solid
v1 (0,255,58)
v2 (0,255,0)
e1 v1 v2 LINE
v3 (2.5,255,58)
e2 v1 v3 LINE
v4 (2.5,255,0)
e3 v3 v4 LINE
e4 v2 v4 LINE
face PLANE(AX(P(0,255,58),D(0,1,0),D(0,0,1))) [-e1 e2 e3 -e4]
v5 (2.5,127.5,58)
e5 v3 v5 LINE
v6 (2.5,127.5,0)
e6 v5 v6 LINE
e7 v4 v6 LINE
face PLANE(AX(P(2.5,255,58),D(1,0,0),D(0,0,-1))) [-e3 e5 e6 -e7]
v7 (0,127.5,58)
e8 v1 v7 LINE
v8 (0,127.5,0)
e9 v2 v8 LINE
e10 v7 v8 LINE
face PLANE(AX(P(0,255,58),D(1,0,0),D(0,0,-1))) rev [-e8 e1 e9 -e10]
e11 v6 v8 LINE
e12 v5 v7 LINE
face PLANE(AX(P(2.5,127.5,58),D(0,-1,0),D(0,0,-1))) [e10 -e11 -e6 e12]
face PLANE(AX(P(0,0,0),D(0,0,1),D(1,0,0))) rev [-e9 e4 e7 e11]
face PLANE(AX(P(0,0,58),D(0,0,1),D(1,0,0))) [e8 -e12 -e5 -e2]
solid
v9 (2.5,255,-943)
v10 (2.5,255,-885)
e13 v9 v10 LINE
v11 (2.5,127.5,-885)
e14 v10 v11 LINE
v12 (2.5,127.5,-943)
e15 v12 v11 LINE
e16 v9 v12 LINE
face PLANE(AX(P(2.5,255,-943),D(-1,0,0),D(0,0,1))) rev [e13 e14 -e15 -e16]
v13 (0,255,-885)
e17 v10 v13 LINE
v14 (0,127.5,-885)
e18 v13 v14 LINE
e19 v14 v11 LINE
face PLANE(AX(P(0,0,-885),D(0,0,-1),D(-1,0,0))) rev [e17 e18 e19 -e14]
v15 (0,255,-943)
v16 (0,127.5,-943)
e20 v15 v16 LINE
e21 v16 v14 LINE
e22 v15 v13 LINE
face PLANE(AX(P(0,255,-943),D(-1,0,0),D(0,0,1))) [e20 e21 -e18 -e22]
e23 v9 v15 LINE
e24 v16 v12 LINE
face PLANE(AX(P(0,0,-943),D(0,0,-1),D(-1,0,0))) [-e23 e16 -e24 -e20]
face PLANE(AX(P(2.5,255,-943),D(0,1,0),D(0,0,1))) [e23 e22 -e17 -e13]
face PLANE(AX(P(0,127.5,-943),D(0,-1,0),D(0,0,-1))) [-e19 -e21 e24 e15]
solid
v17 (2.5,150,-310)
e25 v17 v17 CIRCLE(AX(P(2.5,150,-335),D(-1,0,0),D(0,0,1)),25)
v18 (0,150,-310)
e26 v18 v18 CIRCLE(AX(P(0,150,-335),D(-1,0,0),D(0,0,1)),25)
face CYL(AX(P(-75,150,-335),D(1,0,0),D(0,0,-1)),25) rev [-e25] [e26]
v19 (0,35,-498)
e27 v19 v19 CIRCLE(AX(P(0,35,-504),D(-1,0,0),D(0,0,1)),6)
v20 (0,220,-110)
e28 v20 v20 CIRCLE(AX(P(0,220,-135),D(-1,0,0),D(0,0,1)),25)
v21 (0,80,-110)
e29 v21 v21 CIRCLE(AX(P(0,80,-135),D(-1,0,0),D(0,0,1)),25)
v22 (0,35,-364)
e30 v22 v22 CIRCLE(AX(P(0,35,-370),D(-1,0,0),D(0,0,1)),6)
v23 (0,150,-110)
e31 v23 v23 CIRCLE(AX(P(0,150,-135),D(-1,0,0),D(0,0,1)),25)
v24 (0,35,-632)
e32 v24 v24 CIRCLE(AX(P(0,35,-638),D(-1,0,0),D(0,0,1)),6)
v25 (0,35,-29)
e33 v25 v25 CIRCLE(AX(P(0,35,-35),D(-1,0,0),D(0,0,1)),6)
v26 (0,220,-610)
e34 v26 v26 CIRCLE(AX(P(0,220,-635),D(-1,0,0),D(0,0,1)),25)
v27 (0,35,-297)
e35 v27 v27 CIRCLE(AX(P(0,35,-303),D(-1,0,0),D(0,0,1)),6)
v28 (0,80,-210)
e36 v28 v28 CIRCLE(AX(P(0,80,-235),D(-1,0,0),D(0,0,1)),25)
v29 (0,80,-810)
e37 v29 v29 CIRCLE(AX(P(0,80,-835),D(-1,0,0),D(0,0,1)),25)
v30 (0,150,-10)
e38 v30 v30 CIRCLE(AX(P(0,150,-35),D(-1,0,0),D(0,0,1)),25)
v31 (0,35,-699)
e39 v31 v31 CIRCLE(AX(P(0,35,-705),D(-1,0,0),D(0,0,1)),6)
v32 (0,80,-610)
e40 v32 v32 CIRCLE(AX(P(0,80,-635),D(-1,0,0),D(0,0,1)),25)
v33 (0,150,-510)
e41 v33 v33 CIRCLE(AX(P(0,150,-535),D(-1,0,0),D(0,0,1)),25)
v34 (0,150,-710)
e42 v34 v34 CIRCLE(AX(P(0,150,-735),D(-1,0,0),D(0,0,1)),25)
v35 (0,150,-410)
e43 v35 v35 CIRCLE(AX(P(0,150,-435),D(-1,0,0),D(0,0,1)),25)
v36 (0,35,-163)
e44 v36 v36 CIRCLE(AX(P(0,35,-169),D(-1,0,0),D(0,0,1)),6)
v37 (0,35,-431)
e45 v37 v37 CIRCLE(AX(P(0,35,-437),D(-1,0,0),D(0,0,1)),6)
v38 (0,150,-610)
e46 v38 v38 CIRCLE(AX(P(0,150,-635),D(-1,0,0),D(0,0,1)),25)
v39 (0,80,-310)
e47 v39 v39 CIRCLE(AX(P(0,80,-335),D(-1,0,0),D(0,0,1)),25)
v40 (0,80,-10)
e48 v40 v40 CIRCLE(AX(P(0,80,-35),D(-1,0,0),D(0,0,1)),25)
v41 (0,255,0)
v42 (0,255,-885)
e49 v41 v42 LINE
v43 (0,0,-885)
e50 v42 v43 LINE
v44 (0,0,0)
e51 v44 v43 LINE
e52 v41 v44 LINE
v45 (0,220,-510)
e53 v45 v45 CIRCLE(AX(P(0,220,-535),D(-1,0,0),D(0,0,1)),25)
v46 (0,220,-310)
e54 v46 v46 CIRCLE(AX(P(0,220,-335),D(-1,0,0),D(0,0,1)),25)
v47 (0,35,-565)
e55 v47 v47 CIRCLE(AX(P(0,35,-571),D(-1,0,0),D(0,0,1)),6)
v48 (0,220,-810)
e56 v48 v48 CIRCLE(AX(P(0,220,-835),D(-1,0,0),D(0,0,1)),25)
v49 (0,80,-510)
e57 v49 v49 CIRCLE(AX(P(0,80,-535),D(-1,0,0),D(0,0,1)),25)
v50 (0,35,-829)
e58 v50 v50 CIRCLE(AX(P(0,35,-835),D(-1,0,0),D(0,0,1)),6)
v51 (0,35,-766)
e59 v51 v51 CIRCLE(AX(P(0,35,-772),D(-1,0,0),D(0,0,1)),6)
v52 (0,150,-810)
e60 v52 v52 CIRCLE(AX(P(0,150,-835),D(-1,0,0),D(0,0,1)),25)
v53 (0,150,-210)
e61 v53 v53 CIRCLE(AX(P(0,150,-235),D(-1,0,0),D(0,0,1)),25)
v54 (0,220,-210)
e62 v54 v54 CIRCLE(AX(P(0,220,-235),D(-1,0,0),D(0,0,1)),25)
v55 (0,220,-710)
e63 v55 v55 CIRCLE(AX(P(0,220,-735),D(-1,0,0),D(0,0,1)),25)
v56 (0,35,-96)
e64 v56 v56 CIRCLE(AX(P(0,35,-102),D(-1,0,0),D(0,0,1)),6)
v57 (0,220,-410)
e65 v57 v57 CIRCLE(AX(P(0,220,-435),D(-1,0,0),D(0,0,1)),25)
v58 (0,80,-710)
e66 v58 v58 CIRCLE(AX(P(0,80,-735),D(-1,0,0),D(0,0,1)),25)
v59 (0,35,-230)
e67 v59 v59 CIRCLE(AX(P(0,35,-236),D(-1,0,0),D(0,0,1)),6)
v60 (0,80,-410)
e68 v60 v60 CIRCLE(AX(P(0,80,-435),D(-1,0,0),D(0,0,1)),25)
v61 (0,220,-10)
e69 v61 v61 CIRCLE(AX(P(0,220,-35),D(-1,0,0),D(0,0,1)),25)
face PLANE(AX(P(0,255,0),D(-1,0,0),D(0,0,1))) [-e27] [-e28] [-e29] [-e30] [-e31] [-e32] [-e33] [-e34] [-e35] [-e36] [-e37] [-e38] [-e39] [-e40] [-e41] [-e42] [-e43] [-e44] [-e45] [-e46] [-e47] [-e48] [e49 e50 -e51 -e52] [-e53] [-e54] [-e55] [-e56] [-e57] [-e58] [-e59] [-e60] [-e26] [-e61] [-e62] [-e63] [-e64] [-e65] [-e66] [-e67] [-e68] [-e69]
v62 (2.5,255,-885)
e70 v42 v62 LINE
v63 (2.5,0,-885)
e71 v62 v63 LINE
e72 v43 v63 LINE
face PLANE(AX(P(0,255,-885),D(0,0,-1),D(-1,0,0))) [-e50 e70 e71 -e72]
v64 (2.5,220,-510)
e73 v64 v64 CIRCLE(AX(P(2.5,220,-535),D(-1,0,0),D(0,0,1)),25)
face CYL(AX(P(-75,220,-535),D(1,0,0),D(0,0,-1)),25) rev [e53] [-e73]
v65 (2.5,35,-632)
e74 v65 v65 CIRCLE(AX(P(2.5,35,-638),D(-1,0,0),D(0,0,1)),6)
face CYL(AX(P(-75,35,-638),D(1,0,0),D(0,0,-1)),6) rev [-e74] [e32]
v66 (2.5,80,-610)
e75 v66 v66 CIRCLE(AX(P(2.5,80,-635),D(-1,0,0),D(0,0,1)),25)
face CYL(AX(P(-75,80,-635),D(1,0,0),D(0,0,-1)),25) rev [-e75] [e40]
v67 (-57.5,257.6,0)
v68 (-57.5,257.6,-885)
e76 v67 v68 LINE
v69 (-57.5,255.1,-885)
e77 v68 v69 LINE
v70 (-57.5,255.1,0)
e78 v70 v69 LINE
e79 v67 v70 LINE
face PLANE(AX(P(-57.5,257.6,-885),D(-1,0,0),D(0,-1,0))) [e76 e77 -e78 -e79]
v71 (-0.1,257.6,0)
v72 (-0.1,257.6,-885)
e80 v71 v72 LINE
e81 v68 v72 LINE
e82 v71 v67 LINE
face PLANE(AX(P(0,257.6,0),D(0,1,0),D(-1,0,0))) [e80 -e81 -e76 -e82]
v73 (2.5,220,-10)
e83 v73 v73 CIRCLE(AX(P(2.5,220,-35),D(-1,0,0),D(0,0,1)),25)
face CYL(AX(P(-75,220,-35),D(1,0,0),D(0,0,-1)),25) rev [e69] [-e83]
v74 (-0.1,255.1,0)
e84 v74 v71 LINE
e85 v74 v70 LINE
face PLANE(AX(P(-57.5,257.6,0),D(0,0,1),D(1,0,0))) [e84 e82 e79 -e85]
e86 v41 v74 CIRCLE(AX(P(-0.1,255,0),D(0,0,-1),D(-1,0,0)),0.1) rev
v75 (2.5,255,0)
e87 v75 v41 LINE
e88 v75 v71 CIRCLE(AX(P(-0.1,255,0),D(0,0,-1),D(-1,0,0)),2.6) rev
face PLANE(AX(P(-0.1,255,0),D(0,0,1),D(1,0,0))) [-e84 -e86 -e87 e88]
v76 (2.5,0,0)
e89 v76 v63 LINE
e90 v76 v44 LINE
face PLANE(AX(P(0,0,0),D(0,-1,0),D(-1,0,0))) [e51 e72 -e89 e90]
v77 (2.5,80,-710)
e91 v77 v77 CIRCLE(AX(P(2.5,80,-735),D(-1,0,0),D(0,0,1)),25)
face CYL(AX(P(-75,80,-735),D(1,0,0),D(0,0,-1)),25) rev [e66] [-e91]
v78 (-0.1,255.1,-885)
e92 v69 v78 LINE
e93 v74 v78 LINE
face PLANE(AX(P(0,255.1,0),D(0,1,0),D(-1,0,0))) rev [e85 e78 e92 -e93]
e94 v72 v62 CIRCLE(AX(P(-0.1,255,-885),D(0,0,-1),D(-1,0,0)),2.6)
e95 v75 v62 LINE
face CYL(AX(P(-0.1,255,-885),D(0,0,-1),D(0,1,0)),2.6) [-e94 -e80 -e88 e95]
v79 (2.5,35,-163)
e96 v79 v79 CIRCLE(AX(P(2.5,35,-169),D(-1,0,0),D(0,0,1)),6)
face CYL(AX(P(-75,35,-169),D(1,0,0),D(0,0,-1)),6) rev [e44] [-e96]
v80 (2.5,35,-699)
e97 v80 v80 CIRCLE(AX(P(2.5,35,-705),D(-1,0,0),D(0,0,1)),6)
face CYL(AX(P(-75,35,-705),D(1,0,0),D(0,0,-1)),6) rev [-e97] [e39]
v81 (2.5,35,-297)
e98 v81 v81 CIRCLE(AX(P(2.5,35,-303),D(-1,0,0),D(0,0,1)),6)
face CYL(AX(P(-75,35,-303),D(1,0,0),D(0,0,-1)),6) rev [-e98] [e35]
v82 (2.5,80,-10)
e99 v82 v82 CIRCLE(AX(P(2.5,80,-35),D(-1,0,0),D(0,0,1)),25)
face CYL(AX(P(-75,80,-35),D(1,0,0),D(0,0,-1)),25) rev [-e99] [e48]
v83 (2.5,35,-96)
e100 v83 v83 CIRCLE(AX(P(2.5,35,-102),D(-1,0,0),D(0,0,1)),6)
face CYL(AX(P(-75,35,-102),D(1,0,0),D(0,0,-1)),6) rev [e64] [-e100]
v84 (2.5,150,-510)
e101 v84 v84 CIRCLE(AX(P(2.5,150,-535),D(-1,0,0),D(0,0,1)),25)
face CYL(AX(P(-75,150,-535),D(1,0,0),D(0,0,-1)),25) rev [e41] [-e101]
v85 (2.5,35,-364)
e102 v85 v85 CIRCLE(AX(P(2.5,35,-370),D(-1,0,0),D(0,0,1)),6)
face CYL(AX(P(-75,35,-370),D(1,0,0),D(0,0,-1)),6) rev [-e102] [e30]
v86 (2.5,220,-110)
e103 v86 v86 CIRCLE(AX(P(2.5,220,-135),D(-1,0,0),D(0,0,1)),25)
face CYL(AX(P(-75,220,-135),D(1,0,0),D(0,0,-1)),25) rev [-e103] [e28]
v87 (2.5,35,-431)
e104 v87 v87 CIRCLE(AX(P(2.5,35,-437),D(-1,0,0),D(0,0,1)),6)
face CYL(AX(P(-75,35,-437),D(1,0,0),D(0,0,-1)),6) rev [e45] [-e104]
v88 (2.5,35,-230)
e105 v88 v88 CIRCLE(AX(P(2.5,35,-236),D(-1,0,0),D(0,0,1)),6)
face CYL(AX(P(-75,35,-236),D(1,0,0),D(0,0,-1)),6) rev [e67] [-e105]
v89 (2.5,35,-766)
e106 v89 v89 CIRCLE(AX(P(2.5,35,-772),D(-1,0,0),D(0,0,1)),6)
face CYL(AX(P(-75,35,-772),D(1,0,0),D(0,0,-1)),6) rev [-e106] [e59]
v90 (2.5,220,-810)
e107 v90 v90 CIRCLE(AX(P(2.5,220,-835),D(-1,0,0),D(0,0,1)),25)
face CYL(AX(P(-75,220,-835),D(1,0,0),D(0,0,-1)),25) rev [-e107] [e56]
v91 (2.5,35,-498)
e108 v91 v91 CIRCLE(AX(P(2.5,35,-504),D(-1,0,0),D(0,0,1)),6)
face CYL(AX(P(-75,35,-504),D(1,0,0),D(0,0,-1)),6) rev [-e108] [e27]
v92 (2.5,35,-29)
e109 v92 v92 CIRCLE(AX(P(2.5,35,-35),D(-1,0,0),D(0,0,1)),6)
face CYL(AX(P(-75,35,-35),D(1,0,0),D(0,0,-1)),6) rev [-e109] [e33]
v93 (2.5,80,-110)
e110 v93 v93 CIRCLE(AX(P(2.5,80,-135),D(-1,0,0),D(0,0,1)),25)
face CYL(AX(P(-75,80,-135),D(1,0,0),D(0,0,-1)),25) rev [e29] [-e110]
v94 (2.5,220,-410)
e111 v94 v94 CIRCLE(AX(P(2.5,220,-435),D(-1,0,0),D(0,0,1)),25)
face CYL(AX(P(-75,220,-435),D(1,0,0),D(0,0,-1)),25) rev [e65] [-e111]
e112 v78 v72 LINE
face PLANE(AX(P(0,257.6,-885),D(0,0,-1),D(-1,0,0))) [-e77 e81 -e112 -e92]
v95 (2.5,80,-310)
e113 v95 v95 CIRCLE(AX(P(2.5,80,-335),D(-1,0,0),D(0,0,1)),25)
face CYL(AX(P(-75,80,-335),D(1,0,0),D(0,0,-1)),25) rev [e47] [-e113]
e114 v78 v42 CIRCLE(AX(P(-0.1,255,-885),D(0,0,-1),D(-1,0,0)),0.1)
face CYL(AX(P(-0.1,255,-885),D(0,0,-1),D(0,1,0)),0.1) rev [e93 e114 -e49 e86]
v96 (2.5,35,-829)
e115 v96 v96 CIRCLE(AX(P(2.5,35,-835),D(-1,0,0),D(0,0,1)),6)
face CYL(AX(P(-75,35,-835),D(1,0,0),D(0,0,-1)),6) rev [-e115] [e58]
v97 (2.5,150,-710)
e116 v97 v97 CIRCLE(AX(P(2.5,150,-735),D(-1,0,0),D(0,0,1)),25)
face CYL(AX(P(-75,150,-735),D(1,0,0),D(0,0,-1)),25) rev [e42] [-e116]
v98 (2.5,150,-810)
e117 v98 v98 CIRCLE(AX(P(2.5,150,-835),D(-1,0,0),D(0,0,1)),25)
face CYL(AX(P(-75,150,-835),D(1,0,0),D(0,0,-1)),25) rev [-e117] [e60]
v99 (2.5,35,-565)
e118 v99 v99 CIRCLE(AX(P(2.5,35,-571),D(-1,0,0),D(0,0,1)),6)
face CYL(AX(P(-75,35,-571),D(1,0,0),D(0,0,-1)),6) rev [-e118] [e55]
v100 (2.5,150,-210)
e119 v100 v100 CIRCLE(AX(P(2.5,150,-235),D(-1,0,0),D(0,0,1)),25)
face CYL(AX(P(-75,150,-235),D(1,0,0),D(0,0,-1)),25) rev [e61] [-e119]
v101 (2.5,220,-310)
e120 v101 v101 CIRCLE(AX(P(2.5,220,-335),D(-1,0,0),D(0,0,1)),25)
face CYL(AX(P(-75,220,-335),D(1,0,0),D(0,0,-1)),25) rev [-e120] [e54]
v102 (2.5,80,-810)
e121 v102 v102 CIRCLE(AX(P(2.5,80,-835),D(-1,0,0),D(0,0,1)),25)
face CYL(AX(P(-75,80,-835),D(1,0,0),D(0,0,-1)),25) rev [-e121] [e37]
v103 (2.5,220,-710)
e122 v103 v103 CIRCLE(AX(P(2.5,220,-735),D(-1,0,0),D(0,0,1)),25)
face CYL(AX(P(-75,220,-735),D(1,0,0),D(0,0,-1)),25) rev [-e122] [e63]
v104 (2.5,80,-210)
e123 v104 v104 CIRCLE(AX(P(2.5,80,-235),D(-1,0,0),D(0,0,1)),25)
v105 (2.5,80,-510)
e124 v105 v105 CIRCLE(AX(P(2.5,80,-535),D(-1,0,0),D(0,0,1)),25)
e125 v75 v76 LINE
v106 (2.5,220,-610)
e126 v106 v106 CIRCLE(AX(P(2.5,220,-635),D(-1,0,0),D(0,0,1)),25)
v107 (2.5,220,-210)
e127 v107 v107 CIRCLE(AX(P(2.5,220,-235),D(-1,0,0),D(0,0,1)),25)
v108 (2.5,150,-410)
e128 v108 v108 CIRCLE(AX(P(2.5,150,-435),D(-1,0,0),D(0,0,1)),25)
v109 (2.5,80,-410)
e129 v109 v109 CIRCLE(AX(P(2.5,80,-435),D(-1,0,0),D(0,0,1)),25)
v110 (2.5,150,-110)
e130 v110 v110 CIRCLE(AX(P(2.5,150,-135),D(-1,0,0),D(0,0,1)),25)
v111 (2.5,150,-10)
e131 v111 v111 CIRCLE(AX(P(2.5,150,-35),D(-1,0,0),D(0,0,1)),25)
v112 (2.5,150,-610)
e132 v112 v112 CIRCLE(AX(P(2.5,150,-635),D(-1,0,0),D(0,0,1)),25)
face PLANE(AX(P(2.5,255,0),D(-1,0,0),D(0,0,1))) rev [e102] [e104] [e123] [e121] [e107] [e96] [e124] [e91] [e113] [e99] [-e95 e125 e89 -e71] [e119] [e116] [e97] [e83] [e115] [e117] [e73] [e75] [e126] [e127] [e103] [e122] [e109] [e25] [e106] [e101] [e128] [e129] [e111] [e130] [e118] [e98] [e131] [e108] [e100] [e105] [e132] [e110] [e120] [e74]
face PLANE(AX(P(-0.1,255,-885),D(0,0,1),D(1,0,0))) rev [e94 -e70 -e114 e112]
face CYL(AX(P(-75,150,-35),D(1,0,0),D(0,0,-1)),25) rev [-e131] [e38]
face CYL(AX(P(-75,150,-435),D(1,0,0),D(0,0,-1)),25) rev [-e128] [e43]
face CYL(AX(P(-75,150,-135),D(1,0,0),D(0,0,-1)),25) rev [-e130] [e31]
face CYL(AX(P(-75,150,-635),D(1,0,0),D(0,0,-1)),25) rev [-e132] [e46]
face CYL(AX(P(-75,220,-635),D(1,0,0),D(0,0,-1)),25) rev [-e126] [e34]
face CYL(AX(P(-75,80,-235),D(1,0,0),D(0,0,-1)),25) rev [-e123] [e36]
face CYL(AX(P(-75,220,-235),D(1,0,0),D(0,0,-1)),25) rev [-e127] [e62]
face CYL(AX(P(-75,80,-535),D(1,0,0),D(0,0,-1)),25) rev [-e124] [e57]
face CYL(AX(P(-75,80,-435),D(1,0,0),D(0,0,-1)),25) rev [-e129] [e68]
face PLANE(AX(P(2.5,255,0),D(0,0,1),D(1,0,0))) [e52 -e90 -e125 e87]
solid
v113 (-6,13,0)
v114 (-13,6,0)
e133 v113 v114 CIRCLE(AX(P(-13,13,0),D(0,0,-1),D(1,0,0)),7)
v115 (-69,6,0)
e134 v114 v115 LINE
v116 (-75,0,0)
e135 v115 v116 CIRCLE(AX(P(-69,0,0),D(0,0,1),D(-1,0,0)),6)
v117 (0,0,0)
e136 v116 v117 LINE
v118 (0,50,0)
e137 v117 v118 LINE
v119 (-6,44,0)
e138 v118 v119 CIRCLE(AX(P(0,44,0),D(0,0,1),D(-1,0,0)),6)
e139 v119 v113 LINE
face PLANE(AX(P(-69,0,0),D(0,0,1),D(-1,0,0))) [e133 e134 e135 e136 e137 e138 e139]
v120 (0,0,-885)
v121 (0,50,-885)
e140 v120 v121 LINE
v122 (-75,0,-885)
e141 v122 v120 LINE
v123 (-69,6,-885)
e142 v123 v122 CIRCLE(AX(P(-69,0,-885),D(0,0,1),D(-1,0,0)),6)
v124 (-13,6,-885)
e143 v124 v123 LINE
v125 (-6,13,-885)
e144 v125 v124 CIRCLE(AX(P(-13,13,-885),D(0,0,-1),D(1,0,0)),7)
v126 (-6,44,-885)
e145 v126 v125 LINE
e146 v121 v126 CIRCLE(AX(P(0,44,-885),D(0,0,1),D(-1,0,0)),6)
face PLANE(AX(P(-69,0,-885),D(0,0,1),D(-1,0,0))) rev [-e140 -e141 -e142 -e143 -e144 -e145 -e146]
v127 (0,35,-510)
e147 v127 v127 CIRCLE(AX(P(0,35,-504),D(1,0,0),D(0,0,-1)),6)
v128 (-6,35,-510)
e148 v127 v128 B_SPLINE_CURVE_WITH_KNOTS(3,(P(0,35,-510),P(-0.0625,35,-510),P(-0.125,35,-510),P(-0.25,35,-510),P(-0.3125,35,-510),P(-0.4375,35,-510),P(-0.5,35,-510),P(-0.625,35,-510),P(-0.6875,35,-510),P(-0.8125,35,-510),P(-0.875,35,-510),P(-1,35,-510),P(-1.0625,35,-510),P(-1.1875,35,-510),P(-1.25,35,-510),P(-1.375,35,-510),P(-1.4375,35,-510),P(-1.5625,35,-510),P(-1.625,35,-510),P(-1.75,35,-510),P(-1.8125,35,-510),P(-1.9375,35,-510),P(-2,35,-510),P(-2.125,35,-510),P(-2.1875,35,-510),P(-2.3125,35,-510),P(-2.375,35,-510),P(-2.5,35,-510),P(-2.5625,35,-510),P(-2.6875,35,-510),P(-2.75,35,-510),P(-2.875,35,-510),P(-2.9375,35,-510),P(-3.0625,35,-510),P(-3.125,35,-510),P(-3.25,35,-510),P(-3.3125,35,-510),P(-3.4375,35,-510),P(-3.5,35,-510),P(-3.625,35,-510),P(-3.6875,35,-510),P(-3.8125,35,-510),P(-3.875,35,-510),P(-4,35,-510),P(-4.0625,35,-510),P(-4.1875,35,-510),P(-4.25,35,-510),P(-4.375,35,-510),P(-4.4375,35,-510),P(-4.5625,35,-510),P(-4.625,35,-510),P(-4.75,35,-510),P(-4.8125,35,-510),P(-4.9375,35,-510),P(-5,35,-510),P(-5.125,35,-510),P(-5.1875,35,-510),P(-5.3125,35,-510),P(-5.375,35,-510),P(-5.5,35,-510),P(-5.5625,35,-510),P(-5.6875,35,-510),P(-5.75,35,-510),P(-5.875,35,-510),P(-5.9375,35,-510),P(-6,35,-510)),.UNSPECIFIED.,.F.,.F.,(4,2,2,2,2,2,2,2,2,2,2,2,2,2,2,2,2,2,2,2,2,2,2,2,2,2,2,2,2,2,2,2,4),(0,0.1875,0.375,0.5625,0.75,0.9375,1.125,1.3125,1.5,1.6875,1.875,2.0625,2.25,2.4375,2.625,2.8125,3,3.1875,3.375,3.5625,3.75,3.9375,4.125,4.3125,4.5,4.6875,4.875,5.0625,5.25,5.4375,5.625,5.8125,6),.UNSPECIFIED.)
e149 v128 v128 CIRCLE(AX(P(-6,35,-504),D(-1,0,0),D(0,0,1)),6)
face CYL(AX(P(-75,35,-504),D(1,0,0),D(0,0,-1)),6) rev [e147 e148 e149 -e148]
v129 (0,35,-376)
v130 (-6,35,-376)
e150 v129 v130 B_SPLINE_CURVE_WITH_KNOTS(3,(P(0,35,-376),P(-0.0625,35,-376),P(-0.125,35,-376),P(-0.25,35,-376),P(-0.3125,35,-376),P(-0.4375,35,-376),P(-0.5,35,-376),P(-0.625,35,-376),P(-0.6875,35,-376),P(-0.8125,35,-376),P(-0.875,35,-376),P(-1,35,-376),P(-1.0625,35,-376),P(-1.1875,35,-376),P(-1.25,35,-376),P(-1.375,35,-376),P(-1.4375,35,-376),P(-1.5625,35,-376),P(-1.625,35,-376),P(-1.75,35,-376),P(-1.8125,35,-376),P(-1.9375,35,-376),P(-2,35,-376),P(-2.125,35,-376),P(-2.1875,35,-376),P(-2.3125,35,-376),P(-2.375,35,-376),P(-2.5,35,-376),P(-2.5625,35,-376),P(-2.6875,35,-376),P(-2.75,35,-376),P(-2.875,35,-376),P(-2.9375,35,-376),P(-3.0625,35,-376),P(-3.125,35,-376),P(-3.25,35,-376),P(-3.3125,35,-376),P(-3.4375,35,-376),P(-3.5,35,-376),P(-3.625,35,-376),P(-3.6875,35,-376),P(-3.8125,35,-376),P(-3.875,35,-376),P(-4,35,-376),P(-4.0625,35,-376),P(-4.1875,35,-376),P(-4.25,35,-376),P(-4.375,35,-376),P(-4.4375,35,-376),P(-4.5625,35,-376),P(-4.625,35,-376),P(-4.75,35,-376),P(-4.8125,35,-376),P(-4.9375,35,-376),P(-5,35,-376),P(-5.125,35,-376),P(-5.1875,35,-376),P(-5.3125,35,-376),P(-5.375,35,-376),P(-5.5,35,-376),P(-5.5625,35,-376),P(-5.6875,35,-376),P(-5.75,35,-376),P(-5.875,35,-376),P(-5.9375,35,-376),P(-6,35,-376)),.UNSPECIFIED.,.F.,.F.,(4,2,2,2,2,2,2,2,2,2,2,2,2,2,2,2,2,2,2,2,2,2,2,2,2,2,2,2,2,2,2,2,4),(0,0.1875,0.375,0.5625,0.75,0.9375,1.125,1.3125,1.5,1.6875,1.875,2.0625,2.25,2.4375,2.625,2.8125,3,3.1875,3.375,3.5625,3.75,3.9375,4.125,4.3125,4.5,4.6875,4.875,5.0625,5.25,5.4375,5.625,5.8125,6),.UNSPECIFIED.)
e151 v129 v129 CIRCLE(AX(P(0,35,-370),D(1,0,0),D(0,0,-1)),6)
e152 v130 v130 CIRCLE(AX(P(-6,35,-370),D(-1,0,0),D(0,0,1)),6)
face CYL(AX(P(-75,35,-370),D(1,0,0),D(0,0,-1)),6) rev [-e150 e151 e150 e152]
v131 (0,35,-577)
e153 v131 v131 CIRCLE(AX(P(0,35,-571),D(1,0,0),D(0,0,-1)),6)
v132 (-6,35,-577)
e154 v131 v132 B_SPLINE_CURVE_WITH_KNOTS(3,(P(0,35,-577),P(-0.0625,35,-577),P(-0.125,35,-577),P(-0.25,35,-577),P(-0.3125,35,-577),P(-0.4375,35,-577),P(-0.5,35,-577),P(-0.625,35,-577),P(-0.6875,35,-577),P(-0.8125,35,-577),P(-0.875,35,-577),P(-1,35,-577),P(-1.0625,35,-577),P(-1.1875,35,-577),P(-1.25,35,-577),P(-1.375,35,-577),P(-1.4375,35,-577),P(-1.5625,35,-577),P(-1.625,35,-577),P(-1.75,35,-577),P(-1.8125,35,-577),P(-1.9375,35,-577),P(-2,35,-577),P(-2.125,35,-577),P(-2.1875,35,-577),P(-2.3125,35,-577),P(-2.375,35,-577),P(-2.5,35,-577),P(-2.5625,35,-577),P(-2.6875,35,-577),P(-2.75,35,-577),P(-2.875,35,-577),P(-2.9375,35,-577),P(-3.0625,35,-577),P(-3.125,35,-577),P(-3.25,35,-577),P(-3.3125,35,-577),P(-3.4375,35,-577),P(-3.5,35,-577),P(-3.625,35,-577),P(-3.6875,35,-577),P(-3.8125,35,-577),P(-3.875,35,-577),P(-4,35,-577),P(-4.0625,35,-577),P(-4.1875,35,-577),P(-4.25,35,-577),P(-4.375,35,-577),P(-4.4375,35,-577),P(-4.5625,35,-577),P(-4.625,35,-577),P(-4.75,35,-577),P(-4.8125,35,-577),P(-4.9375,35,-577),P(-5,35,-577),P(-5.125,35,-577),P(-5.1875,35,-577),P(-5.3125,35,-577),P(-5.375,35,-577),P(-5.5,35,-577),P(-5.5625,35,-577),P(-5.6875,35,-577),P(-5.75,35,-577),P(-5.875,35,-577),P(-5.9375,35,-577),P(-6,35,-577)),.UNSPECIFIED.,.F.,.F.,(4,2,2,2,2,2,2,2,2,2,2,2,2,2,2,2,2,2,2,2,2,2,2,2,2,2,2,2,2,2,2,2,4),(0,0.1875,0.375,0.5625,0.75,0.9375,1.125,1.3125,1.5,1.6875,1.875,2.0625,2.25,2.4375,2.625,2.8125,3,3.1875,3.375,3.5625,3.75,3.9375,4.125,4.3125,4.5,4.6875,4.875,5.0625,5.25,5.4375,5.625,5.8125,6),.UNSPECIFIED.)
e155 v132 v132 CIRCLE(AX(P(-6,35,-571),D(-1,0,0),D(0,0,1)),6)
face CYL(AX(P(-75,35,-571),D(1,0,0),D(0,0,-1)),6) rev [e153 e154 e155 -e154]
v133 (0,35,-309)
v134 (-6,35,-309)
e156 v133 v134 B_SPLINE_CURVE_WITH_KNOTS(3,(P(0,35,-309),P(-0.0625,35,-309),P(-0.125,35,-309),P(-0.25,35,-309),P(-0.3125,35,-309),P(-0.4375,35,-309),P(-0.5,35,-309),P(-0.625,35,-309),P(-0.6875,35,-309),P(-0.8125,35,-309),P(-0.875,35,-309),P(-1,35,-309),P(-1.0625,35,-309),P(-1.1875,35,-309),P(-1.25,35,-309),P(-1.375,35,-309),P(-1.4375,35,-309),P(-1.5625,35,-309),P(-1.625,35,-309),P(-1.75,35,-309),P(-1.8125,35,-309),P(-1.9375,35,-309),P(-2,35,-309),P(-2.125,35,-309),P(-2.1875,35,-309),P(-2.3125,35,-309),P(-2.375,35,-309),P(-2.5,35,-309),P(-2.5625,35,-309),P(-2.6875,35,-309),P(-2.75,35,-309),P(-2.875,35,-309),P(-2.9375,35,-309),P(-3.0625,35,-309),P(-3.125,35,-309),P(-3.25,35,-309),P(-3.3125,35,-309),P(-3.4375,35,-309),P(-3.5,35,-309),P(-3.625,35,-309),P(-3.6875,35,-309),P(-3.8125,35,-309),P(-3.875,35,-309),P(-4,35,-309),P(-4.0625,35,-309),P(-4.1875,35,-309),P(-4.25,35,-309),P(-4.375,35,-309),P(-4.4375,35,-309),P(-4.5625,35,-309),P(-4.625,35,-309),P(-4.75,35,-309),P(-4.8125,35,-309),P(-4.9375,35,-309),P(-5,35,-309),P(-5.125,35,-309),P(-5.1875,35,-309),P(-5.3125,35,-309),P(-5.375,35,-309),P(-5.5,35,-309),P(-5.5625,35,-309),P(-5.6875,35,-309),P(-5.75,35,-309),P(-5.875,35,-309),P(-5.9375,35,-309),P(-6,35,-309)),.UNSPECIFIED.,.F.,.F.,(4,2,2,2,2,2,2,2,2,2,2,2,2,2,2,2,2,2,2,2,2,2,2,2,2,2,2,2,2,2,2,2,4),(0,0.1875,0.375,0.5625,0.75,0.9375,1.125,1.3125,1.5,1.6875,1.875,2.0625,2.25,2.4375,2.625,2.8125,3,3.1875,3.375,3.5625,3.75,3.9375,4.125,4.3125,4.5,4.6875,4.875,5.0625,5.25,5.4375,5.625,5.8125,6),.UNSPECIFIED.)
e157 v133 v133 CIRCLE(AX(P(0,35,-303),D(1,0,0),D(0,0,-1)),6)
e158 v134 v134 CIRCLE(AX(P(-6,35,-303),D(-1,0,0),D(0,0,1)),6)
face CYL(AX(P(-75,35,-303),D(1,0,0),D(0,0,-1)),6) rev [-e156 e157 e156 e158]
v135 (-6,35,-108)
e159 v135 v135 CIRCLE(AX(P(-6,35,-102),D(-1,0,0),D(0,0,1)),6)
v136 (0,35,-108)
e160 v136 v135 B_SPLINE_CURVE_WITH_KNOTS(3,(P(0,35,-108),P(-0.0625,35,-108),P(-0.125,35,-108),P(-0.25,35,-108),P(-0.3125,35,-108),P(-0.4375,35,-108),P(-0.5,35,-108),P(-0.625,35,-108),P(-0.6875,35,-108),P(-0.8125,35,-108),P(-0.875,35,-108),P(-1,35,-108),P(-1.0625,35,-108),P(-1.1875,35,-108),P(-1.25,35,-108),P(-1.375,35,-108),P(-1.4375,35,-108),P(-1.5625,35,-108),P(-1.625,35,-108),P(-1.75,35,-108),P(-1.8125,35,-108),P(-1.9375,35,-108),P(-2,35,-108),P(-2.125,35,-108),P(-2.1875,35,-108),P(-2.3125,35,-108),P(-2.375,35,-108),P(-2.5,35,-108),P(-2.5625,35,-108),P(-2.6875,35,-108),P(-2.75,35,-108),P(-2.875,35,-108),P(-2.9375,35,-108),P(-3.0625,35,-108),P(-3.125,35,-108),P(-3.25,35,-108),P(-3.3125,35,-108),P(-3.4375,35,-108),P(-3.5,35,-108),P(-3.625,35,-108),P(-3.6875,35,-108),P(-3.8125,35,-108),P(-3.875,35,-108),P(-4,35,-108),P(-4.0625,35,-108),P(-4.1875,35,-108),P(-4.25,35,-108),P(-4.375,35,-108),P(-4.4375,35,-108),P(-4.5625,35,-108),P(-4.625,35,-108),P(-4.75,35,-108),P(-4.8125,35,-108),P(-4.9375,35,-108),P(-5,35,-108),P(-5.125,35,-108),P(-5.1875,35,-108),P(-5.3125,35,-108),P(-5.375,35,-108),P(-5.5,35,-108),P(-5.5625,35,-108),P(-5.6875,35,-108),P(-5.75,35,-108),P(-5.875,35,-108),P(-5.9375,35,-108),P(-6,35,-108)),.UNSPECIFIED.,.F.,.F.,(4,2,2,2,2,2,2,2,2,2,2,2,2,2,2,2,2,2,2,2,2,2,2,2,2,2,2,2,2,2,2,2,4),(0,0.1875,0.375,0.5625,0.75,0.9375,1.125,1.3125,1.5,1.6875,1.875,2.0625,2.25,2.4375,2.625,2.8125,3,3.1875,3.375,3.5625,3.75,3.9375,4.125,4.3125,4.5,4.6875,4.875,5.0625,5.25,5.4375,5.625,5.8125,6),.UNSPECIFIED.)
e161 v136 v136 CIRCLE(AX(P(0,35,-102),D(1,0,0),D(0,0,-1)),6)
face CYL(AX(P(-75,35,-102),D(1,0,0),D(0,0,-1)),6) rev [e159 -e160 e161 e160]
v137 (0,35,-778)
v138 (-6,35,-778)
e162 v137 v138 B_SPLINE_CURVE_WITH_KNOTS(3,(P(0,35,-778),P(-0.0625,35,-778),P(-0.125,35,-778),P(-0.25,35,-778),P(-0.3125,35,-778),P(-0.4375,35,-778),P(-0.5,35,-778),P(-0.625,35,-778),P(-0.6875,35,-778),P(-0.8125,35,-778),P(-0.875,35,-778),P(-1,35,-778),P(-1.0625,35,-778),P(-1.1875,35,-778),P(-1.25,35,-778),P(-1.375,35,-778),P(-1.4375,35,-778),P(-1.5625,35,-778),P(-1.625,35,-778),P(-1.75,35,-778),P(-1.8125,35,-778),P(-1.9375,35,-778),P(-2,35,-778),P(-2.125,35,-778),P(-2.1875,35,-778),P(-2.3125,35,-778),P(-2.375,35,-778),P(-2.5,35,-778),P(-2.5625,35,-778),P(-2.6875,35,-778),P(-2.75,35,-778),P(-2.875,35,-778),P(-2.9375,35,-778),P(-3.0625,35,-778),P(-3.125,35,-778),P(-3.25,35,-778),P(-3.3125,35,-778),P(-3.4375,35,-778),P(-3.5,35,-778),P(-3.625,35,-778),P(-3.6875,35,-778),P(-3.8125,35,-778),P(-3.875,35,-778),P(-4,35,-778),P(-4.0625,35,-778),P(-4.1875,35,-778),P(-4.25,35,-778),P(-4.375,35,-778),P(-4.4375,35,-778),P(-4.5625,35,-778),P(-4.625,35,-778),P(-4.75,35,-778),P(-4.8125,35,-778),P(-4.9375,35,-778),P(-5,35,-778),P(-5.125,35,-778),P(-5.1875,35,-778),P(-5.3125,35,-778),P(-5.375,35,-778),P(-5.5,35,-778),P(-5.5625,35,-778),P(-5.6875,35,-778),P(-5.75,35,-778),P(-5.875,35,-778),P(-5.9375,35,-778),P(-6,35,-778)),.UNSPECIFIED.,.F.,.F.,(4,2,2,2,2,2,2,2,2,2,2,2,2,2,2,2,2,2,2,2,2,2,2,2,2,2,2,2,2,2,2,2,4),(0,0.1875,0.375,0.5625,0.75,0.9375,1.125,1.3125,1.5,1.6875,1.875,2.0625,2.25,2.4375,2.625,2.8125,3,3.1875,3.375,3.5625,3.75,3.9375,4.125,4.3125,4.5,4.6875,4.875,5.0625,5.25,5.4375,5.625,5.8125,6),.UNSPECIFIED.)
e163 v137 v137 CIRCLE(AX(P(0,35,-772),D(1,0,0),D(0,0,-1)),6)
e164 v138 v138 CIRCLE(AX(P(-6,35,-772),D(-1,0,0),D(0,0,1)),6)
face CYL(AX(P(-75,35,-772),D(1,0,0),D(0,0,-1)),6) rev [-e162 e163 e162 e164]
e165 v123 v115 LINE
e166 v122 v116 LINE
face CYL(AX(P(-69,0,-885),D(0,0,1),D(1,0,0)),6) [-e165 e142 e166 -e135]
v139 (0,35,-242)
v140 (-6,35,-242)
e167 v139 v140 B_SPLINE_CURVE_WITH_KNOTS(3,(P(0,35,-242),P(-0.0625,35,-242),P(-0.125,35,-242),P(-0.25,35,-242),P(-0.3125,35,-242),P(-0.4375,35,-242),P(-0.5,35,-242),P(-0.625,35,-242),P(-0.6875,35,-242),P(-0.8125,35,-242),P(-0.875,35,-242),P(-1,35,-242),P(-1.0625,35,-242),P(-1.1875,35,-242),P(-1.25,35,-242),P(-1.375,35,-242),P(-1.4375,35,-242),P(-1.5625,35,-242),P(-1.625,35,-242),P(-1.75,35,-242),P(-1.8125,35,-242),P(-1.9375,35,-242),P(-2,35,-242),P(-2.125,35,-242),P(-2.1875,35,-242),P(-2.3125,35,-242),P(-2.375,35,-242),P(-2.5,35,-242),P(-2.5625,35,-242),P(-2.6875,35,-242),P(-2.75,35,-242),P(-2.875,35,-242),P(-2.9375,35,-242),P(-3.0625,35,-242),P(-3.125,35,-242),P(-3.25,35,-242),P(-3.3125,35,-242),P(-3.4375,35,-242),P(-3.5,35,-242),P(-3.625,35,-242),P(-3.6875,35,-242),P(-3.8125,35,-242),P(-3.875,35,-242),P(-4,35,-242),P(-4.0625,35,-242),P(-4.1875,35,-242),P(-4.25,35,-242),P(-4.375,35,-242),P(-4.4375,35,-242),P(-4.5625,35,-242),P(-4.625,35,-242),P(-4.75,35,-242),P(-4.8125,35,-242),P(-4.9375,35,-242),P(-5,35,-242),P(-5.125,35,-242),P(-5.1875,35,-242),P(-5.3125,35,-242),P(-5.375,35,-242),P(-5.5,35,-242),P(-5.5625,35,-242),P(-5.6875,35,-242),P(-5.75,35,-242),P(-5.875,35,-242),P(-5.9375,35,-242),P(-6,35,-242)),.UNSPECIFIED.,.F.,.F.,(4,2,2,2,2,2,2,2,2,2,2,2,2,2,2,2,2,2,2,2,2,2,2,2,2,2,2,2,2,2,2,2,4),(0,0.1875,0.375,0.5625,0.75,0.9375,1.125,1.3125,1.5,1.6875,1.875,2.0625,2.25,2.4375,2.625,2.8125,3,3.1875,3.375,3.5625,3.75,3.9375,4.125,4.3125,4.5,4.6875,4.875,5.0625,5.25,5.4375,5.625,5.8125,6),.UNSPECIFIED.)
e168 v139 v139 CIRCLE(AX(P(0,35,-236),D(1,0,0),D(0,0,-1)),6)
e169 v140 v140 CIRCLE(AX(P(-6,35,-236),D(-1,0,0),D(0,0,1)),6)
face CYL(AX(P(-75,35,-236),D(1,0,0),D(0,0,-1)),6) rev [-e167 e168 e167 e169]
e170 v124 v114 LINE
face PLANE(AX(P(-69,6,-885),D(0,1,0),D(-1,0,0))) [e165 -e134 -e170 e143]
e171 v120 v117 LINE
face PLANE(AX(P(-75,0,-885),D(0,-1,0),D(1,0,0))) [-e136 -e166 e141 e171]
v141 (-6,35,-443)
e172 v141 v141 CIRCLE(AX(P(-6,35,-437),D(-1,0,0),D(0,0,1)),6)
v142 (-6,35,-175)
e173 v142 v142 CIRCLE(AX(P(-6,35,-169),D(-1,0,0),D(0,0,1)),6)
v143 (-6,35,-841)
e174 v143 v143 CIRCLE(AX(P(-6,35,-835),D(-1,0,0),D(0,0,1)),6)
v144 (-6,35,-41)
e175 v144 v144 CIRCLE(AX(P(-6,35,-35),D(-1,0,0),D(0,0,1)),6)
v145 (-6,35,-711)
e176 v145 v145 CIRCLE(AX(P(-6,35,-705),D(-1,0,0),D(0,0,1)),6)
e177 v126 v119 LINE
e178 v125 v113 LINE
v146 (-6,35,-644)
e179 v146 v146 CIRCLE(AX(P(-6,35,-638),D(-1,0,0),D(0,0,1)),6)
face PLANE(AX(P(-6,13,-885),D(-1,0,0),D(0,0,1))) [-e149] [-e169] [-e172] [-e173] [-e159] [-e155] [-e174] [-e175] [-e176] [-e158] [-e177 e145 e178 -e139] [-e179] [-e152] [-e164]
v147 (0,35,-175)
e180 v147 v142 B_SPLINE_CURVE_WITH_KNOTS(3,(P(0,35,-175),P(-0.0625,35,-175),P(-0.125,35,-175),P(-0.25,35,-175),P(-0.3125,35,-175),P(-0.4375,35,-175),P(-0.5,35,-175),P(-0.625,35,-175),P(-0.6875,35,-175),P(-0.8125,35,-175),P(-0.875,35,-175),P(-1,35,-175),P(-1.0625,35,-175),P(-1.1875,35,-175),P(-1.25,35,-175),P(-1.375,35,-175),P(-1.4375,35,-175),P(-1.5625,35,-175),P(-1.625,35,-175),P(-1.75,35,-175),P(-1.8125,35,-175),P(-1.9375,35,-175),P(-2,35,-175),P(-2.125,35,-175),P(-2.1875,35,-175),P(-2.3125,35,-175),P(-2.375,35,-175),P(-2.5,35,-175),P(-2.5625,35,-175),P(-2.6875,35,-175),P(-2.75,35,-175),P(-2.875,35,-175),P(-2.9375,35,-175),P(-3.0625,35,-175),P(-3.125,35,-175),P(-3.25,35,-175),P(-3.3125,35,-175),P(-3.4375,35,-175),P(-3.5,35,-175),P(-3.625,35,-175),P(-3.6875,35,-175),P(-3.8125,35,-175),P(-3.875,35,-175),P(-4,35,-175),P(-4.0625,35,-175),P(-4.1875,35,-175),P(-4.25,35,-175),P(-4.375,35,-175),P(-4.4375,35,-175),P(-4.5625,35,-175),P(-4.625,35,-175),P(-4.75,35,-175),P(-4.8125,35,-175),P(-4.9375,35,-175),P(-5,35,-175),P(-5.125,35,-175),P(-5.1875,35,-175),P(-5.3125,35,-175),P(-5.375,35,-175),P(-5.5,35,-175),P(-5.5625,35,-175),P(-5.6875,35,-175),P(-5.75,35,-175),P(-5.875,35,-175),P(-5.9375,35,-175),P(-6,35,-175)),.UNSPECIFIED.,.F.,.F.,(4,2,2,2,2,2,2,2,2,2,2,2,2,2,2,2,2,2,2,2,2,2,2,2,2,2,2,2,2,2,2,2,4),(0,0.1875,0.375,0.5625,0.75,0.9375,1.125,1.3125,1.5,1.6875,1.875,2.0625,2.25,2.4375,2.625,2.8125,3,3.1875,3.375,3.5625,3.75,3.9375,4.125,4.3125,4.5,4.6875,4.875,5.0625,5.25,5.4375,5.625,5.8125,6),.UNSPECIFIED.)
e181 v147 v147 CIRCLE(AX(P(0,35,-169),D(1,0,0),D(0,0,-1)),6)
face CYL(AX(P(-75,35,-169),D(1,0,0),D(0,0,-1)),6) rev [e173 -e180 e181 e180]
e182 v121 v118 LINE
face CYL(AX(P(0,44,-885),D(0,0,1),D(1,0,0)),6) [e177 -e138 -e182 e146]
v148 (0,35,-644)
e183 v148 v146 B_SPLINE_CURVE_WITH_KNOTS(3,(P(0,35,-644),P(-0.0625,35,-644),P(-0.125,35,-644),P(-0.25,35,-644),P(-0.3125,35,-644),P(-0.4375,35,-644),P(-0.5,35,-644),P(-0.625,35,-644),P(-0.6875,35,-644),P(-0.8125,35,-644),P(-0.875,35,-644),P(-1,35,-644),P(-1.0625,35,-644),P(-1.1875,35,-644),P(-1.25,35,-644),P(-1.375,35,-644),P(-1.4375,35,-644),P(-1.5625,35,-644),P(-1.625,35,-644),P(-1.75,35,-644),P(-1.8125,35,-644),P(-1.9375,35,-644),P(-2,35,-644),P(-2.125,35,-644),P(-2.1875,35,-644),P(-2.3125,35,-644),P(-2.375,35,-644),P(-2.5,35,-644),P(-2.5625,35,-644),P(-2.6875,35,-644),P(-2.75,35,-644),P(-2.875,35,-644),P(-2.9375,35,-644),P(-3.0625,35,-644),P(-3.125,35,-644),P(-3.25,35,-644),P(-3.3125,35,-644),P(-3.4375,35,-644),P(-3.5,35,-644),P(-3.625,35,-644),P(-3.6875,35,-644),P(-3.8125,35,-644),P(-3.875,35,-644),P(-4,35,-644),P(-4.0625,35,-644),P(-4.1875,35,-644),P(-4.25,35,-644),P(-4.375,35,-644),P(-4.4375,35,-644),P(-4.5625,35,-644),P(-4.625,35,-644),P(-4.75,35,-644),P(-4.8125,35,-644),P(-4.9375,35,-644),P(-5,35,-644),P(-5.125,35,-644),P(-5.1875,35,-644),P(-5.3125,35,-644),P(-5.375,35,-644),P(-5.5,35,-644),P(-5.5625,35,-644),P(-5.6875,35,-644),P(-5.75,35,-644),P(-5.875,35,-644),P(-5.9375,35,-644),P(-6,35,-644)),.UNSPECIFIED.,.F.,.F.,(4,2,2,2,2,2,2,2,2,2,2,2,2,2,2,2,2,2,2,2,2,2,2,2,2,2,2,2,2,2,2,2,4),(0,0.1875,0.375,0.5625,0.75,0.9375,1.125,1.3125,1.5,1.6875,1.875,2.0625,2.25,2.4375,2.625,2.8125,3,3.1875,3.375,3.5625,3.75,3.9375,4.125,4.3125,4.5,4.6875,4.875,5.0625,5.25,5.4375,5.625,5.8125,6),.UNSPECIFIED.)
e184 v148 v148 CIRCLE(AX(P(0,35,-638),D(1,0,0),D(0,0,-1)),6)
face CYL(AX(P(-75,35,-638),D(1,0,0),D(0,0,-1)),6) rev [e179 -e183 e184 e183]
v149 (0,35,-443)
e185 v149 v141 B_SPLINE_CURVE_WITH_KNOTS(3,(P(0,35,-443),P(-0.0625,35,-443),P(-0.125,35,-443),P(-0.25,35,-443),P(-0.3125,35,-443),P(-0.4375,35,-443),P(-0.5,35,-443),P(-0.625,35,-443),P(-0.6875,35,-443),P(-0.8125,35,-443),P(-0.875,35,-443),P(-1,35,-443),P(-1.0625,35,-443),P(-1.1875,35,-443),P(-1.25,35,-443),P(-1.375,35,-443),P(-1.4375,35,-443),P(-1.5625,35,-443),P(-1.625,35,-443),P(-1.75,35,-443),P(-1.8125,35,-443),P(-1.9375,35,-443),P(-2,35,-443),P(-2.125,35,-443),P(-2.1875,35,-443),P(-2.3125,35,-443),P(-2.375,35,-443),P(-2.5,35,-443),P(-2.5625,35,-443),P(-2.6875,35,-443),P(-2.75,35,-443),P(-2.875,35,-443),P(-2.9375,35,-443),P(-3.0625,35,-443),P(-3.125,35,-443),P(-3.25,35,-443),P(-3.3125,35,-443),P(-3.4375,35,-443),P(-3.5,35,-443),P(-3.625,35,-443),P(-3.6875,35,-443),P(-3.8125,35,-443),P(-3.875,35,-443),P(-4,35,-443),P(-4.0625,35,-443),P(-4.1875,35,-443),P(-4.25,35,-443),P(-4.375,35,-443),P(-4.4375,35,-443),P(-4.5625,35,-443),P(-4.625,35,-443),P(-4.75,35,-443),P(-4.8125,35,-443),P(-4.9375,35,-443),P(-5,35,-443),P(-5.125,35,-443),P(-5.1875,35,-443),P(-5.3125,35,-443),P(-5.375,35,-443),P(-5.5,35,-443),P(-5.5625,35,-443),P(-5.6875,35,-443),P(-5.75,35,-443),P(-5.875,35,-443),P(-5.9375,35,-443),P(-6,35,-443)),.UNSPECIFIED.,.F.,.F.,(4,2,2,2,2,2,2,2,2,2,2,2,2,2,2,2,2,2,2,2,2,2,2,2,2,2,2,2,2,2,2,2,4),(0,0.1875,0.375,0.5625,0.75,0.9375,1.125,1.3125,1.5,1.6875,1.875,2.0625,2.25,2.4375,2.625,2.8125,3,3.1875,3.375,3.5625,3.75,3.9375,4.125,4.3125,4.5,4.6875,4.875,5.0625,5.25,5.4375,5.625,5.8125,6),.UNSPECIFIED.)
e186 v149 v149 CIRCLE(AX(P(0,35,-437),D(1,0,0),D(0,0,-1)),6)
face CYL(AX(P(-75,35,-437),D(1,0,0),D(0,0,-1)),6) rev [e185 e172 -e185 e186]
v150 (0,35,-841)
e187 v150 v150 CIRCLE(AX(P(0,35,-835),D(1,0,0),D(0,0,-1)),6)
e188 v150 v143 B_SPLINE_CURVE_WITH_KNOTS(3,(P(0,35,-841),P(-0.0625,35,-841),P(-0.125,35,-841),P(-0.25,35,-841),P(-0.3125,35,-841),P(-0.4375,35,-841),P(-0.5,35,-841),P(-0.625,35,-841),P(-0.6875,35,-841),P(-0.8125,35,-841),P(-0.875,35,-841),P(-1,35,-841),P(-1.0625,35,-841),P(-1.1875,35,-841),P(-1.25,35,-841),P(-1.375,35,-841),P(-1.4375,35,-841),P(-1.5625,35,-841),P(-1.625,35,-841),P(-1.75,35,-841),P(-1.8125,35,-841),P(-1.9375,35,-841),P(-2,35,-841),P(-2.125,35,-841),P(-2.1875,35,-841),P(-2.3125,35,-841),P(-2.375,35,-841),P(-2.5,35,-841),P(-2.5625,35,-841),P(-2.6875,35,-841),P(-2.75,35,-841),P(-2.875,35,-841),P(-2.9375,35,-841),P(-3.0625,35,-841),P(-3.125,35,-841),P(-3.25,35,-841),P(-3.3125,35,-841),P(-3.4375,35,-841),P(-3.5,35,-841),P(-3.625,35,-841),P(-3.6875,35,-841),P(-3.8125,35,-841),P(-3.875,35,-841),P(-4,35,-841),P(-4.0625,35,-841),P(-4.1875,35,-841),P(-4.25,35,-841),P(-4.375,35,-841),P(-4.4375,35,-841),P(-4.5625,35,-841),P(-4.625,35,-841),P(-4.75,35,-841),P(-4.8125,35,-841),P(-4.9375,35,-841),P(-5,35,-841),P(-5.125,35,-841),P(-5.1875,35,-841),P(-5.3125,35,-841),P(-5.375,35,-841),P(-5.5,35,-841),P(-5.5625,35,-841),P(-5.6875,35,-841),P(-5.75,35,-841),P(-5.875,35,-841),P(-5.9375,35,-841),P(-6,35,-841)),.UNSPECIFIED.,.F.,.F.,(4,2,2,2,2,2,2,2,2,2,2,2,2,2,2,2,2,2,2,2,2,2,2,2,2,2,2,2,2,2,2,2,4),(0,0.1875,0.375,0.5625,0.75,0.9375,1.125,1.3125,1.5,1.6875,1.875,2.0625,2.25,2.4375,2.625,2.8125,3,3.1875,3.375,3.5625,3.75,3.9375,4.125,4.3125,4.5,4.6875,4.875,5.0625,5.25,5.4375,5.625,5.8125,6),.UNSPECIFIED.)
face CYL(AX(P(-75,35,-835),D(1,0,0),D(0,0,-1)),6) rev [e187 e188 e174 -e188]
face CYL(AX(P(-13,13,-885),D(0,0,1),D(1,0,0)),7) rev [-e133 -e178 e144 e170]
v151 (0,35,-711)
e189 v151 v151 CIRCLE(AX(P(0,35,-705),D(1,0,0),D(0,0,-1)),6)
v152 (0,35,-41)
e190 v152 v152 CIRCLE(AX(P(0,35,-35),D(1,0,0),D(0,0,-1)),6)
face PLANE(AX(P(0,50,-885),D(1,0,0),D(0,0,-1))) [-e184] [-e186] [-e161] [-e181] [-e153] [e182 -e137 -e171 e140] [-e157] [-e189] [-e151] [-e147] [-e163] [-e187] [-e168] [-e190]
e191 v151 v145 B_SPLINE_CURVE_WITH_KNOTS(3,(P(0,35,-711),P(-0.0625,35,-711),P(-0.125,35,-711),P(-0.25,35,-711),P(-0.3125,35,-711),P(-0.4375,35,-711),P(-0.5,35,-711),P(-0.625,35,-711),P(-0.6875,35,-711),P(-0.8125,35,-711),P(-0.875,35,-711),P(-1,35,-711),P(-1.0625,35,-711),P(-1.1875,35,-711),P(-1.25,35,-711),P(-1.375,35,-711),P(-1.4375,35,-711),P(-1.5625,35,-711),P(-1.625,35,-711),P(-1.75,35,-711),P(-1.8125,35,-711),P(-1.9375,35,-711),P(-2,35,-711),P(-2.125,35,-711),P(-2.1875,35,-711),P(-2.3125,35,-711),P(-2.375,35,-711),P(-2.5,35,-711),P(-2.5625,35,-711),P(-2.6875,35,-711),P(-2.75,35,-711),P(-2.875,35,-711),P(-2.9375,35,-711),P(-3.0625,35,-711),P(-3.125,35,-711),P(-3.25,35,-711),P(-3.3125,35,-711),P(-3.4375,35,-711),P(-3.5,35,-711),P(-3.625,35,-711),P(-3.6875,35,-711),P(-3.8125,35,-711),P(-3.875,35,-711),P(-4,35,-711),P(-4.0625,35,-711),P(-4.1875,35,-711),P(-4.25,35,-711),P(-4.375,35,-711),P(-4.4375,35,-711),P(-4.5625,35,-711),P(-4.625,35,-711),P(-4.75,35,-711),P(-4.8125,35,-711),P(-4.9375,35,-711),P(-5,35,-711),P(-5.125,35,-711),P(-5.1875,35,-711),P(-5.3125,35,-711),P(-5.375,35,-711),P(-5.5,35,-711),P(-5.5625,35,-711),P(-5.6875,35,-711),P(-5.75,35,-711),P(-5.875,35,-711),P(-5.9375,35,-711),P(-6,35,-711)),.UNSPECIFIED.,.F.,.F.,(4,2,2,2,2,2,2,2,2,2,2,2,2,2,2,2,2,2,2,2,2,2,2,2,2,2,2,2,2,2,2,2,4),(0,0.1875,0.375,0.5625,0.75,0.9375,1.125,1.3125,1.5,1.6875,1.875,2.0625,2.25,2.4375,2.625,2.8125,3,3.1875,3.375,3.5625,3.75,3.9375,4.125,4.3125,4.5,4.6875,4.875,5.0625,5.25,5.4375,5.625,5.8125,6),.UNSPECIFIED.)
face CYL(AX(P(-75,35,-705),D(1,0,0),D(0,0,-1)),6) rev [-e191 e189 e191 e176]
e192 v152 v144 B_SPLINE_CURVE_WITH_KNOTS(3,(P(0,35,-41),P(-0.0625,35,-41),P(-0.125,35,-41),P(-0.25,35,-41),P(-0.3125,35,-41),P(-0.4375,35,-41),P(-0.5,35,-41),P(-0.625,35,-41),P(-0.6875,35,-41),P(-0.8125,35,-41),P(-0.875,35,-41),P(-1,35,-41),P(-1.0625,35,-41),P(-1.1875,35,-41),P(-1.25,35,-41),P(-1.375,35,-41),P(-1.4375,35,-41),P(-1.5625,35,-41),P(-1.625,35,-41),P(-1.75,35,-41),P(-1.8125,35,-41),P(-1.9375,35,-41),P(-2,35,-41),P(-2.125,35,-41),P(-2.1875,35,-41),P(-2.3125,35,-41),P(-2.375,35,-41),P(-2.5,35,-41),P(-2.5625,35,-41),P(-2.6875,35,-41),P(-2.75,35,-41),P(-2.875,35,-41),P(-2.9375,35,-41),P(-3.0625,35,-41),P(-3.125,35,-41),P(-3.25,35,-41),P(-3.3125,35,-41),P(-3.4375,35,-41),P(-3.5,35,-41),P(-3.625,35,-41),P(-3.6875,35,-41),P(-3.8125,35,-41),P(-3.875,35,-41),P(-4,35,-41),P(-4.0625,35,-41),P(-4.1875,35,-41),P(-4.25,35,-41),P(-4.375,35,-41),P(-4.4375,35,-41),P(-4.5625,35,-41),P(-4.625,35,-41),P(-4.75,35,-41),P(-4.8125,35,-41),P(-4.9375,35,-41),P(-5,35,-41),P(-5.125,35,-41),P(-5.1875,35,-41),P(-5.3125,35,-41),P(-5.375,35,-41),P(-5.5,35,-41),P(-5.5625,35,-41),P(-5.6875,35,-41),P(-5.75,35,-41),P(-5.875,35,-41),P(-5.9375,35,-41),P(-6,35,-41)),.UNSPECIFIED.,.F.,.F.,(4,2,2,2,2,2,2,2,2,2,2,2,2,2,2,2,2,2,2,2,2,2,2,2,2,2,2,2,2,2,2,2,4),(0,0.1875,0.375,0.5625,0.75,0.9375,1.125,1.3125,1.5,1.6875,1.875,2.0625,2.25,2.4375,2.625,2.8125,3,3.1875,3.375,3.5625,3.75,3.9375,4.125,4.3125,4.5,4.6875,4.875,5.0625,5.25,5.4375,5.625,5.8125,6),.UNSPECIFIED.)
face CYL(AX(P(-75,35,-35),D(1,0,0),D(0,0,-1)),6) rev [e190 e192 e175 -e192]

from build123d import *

# Parameters (mm, degrees)
L_ANGLE_UNEQUAL_75X50X6_1_DEPTH = 885
SKETCH12_W                      = 2.5
SKETCH12_H                      = 885
BASE_FLANGE1_DEPTH              = 255
CUT_EXTRUDE1_DEPTH              = 925.259839006
CUT_EXTRUDE1_DEPTH_BACK         = 925.259839006
SKETCH17_R                      = 25
CUT_EXTRUDE2_DEPTH              = 925.259839006
CUT_EXTRUDE2_DEPTH_BACK         = 925.259839006
SKETCH18_R                      = 6
SKETCH19_W                      = 2.5
SKETCH19_H                      = 127.5
BASE_FLANGE2_DEPTH              = 58
SKETCH26_W                      = 2.5
SKETCH26_H                      = 127.5
BASE_FLANGE4_DEPTH              = 58
EDGE_FLANGE1_DEPTH              = 885


# Sheet-metal steps are written as plain solids
with BuildPart() as part:
    # Sketch11 → L angle (unequal) 75X50X6(1) (new body)
    with BuildSketch(Plane(origin=(0, 0, 0), x_dir=(0, 1, 0), z_dir=(0, 0, 1))):
        with BuildLine():
            Line((0, 75), (0, 0))
            Line((0, 0), (50, 0))
            ThreePointArc((50, 0), (48.242640687, 4.242640687), (44, 6))
            Line((44, 6), (13, 6))
            ThreePointArc((13, 6), (8.050252532, 8.050252532), (6, 13))
            Line((6, 13), (6, 69))
            ThreePointArc((6, 69), (4.242640687, 73.242640687), (0, 75))
        make_face()
    extrude(amount=-L_ANGLE_UNEQUAL_75X50X6_1_DEPTH)


with BuildPart() as body_2:
    # Sketch12 → Base-Flange1 (new body)
    with BuildSketch(Plane(origin=(0, 0, 0), x_dir=(1, 0, 0), z_dir=(0, 1, 0))):
        with Locations((1.25, 442.5)):
            Rectangle(SKETCH12_W, SKETCH12_H)
    extrude(amount=BASE_FLANGE1_DEPTH)

    # Sketch17 → Cut-Extrude1 (cut, two sides: drawn at the far end of the back side and taken through both)
    with BuildSketch(Plane(origin=(2.5, 0, 0), x_dir=(0, 0, -1), z_dir=(1, 0, 0)).offset(-CUT_EXTRUDE1_DEPTH_BACK)):
        with Locations(Location((35, 220, 0), (0, 0, 180))):
            Circle(SKETCH17_R)
        with Locations(Location((135, 220, 0), (0, 0, 180))):
            Circle(SKETCH17_R)
        with Locations(Location((235, 220, 0), (0, 0, 180))):
            Circle(SKETCH17_R)
        with Locations(Location((335, 220, 0), (0, 0, 180))):
            Circle(SKETCH17_R)
        with Locations(Location((435, 220, 0), (0, 0, 180))):
            Circle(SKETCH17_R)
        with Locations(Location((535, 220, 0), (0, 0, 180))):
            Circle(SKETCH17_R)
        with Locations(Location((635, 220, 0), (0, 0, 180))):
            Circle(SKETCH17_R)
        with Locations(Location((735, 220, 0), (0, 0, 180))):
            Circle(SKETCH17_R)
        with Locations(Location((835, 220, 0), (0, 0, 180))):
            Circle(SKETCH17_R)
        with Locations(Location((35, 150, 0), (0, 0, 180))):
            Circle(SKETCH17_R)
        with Locations(Location((135, 150, 0), (0, 0, 180))):
            Circle(SKETCH17_R)
        with Locations(Location((235, 150, 0), (0, 0, 180))):
            Circle(SKETCH17_R)
        with Locations(Location((335, 150, 0), (0, 0, 180))):
            Circle(SKETCH17_R)
        with Locations(Location((435, 150, 0), (0, 0, 180))):
            Circle(SKETCH17_R)
        with Locations(Location((535, 150, 0), (0, 0, 180))):
            Circle(SKETCH17_R)
        with Locations(Location((635, 150, 0), (0, 0, 180))):
            Circle(SKETCH17_R)
        with Locations(Location((735, 150, 0), (0, 0, 180))):
            Circle(SKETCH17_R)
        with Locations(Location((835, 150, 0), (0, 0, 180))):
            Circle(SKETCH17_R)
        with Locations(Location((35, 80, 0), (0, 0, 180))):
            Circle(SKETCH17_R)
        with Locations(Location((135, 80, 0), (0, 0, 180))):
            Circle(SKETCH17_R)
        with Locations(Location((235, 80, 0), (0, 0, 180))):
            Circle(SKETCH17_R)
        with Locations(Location((335, 80, 0), (0, 0, 180))):
            Circle(SKETCH17_R)
        with Locations(Location((435, 80, 0), (0, 0, 180))):
            Circle(SKETCH17_R)
        with Locations(Location((535, 80, 0), (0, 0, 180))):
            Circle(SKETCH17_R)
        with Locations(Location((635, 80, 0), (0, 0, 180))):
            Circle(SKETCH17_R)
        with Locations(Location((735, 80, 0), (0, 0, 180))):
            Circle(SKETCH17_R)
        with Locations(Location((835, 80, 0), (0, 0, 180))):
            Circle(SKETCH17_R)
    extrude(amount=CUT_EXTRUDE1_DEPTH + CUT_EXTRUDE1_DEPTH_BACK, mode=Mode.SUBTRACT)


with BuildPart() as cut_extrude2_tool:
    # Sketch18 → Cut-Extrude2 (new, two sides: drawn at the far end of the back side and taken through both)
    with BuildSketch(Plane(origin=(2.5, 0, 0), x_dir=(0, 0, -1), z_dir=(1, 0, 0)).offset(-CUT_EXTRUDE2_DEPTH_BACK)):
        with Locations(Location((35, 35, 0), (0, 0, 180))):
            Circle(SKETCH18_R)
        with Locations(Location((835, 35, 0), (0, 0, 180))):
            Circle(SKETCH18_R)
        with Locations(Location((102, 35, 0), (0, 0, 180))):
            Circle(SKETCH18_R)
        with Locations(Location((169, 35, 0), (0, 0, 180))):
            Circle(SKETCH18_R)
        with Locations(Location((236, 35, 0), (0, 0, 180))):
            Circle(SKETCH18_R)
        with Locations(Location((303, 35, 0), (0, 0, 180))):
            Circle(SKETCH18_R)
        with Locations(Location((370, 35, 0), (0, 0, 180))):
            Circle(SKETCH18_R)
        with Locations(Location((437, 35, 0), (0, 0, 180))):
            Circle(SKETCH18_R)
        with Locations(Location((504, 35, 0), (0, 0, 180))):
            Circle(SKETCH18_R)
        with Locations(Location((571, 35, 0), (0, 0, 180))):
            Circle(SKETCH18_R)
        with Locations(Location((638, 35, 0), (0, 0, 180))):
            Circle(SKETCH18_R)
        with Locations(Location((705, 35, 0), (0, 0, 180))):
            Circle(SKETCH18_R)
        with Locations(Location((772, 35, 0), (0, 0, 180))):
            Circle(SKETCH18_R)
    extrude(amount=CUT_EXTRUDE2_DEPTH + CUT_EXTRUDE2_DEPTH_BACK)


with BuildPart() as part_1:
    add(part.part)

    # Cut-Extrude2: cut by cut_extrude2_tool
    add(cut_extrude2_tool.part, mode=Mode.SUBTRACT)


with BuildPart() as body_2_1:
    add(body_2.part)

    # Cut-Extrude2: cut by cut_extrude2_tool
    add(cut_extrude2_tool.part, mode=Mode.SUBTRACT)

    # Edge-Flange1 section (across the edge) → Edge-Flange1 (add)
    with BuildSketch(Plane(origin=(0, 255.1, 0), x_dir=(0, -1, 0), z_dir=(0, 0, -1))):
        with BuildLine():
            Line((-2.5, 0.1), (-2.5, 57.5))
            Line((-2.5, 57.5), (0, 57.5))
            Line((0, 57.5), (0, 0.1))
            ThreePointArc((0, 0.1), (0.029289322, 0.029289322), (0.1, 0))
            Line((0.1, 0), (0.1, -2.5))
            ThreePointArc((0.1, -2.5), (-1.738477631, -1.738477631), (-2.5, 0.1))
        make_face()
    extrude(amount=EDGE_FLANGE1_DEPTH)


with BuildPart() as body_3:
    # Sketch19 → Base-Flange2 (new body)
    with BuildSketch(Plane.XY):
        with Locations((1.25, 191.25)):
            Rectangle(SKETCH19_W, SKETCH19_H)
    extrude(amount=BASE_FLANGE2_DEPTH)


with BuildPart() as body_4:
    # Sketch26 → Base-Flange4 (new body)
    with BuildSketch(Plane(origin=(0, 0, -885), x_dir=(-1, 0, 0), z_dir=(0, 0, -1))):
        with Locations((-1.25, 191.25)):
            Rectangle(SKETCH26_W, SKETCH26_H)
    extrude(amount=BASE_FLANGE4_DEPTH)


solid = Compound([part_1.part, body_2_1.part, body_3.part, body_4.part])
